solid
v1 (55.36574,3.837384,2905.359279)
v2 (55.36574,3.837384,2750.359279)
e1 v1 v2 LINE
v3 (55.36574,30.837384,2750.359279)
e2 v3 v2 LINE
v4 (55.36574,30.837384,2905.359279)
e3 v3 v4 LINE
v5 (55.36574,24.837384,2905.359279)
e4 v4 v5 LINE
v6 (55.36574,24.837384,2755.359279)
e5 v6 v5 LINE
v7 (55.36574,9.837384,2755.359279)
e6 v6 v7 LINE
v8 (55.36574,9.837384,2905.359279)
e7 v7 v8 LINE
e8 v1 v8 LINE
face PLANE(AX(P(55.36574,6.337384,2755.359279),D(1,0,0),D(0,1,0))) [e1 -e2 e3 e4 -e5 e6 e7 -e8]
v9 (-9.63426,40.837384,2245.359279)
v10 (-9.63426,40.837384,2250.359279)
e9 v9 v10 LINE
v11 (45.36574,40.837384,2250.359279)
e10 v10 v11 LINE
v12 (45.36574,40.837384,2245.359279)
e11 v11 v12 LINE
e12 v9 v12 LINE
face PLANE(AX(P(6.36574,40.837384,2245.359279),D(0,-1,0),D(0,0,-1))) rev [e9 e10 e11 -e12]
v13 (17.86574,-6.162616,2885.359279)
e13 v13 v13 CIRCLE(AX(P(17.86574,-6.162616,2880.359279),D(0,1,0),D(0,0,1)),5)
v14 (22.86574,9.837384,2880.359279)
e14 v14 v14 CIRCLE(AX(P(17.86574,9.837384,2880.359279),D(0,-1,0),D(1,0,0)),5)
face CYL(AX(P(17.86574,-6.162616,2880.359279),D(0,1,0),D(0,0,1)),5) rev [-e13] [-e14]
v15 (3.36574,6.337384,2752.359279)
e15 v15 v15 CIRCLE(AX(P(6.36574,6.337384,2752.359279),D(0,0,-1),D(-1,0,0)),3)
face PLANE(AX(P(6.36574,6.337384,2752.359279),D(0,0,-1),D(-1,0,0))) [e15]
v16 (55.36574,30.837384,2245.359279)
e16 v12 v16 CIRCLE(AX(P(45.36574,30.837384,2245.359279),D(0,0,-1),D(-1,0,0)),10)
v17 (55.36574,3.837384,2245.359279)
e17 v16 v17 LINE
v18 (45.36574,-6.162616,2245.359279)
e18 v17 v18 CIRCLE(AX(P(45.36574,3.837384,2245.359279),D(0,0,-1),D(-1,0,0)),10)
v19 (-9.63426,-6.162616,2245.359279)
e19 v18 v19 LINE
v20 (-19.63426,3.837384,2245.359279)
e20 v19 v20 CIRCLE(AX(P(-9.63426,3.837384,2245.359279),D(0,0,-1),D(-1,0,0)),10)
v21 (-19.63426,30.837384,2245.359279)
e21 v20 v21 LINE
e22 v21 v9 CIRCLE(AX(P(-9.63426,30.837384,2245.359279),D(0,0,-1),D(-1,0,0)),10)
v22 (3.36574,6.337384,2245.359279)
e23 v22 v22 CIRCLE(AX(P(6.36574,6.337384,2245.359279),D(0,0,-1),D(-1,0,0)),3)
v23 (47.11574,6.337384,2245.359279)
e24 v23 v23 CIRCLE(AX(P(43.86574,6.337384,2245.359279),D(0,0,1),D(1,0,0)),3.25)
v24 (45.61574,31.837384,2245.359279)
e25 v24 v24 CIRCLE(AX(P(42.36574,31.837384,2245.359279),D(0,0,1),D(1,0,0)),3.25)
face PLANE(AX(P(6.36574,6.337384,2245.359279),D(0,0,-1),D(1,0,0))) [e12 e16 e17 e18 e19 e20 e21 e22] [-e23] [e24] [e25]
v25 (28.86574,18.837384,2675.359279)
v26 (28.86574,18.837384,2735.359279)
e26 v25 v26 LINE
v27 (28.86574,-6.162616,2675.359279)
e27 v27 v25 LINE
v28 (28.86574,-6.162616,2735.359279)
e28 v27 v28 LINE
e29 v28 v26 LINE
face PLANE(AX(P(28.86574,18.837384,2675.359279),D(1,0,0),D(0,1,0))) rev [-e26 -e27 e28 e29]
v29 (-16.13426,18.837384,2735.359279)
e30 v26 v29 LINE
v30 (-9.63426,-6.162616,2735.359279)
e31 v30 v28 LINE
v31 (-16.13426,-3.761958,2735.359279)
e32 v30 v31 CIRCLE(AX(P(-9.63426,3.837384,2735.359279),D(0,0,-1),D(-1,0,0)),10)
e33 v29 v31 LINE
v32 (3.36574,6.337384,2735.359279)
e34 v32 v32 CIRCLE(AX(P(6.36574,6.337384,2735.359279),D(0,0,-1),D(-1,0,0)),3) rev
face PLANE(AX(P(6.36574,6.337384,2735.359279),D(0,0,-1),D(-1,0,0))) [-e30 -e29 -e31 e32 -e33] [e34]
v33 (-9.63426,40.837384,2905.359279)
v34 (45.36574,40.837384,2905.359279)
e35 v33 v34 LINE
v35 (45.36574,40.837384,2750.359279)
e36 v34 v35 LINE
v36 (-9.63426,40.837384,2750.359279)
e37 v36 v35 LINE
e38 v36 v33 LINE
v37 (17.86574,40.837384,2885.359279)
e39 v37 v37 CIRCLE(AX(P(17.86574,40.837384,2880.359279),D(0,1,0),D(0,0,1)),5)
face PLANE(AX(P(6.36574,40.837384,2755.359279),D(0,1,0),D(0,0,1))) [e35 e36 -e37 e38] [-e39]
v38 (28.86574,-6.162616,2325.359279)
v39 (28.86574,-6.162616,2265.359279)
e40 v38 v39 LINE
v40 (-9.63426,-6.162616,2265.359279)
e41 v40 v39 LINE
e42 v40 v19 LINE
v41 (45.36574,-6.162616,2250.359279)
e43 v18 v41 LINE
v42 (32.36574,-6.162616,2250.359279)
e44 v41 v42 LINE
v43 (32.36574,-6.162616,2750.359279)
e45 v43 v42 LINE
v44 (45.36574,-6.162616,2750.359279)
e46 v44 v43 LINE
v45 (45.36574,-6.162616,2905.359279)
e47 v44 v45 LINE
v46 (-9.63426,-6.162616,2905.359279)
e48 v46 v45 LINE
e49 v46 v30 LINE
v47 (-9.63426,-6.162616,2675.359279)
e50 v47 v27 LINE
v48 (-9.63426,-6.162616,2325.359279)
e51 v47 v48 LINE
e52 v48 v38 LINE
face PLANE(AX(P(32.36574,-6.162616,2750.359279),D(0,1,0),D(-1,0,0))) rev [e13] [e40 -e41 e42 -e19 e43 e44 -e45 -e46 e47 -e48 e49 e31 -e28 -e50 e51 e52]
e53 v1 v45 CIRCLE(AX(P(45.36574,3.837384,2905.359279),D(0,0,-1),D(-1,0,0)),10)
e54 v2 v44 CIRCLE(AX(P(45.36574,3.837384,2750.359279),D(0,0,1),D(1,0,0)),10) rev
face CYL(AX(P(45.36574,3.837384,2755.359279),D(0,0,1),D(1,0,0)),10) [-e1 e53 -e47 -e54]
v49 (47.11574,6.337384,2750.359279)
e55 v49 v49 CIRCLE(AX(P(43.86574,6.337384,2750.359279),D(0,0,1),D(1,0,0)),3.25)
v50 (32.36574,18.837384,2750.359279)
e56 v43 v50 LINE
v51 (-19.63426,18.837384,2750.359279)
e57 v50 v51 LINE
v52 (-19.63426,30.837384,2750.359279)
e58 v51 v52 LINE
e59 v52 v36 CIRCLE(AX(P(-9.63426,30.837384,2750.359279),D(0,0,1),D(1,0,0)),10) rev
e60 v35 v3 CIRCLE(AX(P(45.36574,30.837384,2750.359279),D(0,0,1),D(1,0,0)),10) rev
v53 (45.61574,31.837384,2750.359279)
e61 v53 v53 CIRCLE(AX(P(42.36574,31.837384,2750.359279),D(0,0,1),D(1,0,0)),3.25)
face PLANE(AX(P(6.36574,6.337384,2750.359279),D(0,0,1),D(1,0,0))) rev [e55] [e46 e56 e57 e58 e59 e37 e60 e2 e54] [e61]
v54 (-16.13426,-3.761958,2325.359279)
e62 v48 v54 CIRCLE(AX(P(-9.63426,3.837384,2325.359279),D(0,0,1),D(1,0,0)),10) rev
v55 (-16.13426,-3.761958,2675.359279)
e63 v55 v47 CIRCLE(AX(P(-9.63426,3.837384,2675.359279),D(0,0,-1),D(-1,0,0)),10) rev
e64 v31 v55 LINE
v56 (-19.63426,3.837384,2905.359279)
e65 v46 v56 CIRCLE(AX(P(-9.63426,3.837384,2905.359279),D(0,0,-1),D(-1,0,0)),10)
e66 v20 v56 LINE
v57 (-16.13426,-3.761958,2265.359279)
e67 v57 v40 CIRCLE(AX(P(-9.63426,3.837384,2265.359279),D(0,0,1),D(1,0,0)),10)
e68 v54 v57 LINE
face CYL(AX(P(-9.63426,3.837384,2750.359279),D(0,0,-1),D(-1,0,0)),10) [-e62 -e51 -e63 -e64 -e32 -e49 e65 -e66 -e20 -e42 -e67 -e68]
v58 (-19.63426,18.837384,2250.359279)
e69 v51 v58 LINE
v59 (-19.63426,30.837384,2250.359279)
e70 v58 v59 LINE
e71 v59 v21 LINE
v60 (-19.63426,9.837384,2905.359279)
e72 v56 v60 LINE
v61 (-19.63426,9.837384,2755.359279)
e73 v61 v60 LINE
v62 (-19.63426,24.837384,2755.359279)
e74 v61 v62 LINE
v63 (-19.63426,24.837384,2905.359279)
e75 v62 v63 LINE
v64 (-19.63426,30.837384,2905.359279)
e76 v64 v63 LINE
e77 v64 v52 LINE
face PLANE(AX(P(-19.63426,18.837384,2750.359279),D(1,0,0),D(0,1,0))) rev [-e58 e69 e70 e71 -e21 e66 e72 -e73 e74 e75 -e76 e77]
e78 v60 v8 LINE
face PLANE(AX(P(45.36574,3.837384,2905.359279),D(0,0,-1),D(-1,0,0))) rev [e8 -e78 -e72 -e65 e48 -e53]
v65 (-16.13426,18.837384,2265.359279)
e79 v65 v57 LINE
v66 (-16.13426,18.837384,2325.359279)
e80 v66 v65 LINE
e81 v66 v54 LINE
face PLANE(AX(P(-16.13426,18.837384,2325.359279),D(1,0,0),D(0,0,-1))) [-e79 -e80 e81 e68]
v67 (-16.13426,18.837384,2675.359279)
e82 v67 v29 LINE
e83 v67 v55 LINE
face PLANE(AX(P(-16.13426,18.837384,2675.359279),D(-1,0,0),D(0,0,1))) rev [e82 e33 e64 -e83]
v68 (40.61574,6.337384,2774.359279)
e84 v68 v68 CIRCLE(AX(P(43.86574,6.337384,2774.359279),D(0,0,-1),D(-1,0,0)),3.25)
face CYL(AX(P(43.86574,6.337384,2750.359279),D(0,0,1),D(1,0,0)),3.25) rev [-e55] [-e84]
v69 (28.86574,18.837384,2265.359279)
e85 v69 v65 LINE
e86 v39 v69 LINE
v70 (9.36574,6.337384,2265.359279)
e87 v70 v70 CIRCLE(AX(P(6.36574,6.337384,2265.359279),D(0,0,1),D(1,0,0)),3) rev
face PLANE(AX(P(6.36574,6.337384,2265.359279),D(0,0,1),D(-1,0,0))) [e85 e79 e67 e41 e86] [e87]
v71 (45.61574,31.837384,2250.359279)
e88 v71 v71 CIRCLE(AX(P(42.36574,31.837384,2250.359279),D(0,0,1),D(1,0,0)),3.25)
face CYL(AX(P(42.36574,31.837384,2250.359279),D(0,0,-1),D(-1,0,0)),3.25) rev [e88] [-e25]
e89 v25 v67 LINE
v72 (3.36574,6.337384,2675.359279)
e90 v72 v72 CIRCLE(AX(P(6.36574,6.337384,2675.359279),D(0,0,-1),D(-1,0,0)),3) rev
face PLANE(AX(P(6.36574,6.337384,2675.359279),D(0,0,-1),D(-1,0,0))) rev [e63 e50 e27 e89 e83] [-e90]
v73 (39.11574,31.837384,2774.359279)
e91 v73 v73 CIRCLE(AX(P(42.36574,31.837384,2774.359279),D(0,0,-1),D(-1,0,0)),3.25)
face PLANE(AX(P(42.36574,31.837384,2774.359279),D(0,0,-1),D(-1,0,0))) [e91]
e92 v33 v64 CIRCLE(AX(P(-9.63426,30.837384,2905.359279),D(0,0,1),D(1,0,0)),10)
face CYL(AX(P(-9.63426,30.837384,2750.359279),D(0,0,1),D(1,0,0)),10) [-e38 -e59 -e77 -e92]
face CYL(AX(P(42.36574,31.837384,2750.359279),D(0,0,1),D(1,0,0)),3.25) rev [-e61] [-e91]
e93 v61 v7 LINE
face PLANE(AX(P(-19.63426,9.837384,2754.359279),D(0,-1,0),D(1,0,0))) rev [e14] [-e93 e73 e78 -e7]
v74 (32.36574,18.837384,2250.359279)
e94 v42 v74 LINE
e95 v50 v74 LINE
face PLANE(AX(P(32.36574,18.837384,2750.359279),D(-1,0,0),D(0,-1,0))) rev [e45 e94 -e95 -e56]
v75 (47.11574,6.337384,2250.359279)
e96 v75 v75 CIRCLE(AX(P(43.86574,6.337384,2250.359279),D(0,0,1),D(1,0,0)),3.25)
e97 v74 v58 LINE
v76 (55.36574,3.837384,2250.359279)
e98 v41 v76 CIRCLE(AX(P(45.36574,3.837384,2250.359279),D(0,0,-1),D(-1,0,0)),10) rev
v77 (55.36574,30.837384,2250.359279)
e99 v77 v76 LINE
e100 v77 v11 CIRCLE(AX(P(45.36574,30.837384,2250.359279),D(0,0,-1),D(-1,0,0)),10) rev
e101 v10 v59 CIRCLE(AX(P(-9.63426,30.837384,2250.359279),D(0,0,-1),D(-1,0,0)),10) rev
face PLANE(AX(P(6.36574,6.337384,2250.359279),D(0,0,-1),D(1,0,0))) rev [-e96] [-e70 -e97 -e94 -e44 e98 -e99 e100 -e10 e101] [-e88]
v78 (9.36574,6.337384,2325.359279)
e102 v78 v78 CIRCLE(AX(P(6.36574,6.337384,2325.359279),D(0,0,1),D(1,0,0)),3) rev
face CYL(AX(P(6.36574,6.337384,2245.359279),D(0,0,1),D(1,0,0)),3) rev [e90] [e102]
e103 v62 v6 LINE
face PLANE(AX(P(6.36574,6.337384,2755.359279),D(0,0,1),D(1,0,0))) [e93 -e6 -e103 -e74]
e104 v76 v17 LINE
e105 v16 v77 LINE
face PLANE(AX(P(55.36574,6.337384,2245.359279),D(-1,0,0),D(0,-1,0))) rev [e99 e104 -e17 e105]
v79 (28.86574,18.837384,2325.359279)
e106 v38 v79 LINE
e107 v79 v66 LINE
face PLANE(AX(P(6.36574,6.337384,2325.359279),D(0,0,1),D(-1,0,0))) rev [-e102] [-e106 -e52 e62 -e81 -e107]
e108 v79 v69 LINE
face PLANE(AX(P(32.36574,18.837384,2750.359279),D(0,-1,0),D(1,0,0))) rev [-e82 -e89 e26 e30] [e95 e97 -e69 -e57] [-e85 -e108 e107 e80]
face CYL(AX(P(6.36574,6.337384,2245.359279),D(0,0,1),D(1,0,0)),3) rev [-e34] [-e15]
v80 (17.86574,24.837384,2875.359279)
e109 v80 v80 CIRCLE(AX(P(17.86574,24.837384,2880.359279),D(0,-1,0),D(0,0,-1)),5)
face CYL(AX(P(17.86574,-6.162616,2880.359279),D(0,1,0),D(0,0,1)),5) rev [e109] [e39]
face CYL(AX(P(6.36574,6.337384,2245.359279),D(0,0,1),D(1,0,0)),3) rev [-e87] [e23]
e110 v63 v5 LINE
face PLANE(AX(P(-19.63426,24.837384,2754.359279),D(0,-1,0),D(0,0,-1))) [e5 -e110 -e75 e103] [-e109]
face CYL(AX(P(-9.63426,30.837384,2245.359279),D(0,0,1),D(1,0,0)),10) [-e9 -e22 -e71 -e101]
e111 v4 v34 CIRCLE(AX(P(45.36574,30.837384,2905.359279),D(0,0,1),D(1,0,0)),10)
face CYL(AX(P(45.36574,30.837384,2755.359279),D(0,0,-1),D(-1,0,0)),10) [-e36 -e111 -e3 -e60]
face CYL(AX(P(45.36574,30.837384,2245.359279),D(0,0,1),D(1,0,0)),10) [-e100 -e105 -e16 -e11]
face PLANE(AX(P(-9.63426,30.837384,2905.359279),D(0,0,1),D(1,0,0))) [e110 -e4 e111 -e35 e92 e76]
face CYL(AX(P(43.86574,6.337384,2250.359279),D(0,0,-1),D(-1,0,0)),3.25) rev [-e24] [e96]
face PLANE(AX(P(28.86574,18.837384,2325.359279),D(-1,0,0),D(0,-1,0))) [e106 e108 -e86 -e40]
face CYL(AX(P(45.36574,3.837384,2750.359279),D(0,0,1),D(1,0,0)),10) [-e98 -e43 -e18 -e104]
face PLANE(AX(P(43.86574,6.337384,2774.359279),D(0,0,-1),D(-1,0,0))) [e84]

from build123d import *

# Parameters (mm, degrees)
SKETCH1_W                = 520
SKETCH1_H                = 250
BOSS_EXTRUDE1_DEPTH      = 5000
SKETCH2_W                = 450
SKETCH2_H                = 250
CUT_EXTRUDE1_DEPTH       = 600
SKETCH3_W                = 750
SKETCH3_H                = 470
BOSS_EXTRUDE2_DEPTH      = 50
SKETCH4_R                = 32.5
CUT_EXTRUDE2_DEPTH       = 50
CUT_EXTRUDE3_DEPTH       = 4937.509394299
CUT_EXTRUDE3_DEPTH_BACK  = 170
SKETCH5_R                = 30
SCALE2_SCALE             = 0.1
FILLET1_R                = 10
BOSS_EXTRUDE9_DEPTH      = 150
BOSS_EXTRUDE9_DEPTH_BACK = 1
CUT_EXTRUDE4_DEPTH       = 2907.266833376
CUT_EXTRUDE4_DEPTH_BACK  = 2907.266833376
SKETCH7_R                = 5
SKETCH8_R                = 3.25
CUT_EXTRUDE5_DEPTH       = 20


with BuildPart() as part:
    # Sketch1 → Boss-Extrude1 (new body)
    with BuildSketch(Plane.XY):
        Rectangle(SKETCH1_W, SKETCH1_H)
    extrude(amount=BOSS_EXTRUDE1_DEPTH)

    # Sketch2 → Cut-Extrude1 (cut)
    with BuildSketch(Plane.XY.offset(4850)):
        Rectangle(SKETCH2_W, SKETCH2_H)
    cut_extrude1 = extrude(amount=-CUT_EXTRUDE1_DEPTH, mode=Mode.SUBTRACT)

    # Mirror1: Cut-Extrude1 across plane
    add(cut_extrude1.mirror(Plane.XY.offset(2500)), mode=Mode.SUBTRACT)

    # Sketch3 → Boss-Extrude2 (add)
    with BuildSketch(Plane.XY.offset(5000)):
        with Locations((115, 110)):
            Rectangle(SKETCH3_W, SKETCH3_H)
    boss_extrude2 = extrude(amount=BOSS_EXTRUDE2_DEPTH)

    # Sketch4 → Cut-Extrude2 (cut)
    with BuildSketch(Plane.XY.offset(5050)):
        with Locations((375, 0)):
            Circle(SKETCH4_R)
        with Locations((360, 255)):
            Circle(SKETCH4_R)
    cut_extrude2 = extrude(amount=-CUT_EXTRUDE2_DEPTH, mode=Mode.SUBTRACT)

    # Mirror2: Boss-Extrude2, Cut-Extrude2 across plane
    add(boss_extrude2.mirror(Plane.XY.offset(2500)))
    add(cut_extrude2.mirror(Plane.XY.offset(2500)), mode=Mode.SUBTRACT)

    # Sketch5 → Cut-Extrude3 (cut, two sides: drawn at the far end of the back side and taken through both)
    with BuildSketch(Plane(origin=(0, 0, 4850), x_dir=(-1, 0, 0), z_dir=(0, 0, -1)).offset(-CUT_EXTRUDE3_DEPTH_BACK)):
        with Locations(Location((0, 0, 0), (0, 0, 180))):
            Circle(SKETCH5_R)
    extrude(amount=CUT_EXTRUDE3_DEPTH + CUT_EXTRUDE3_DEPTH_BACK, mode=Mode.SUBTRACT)


with BuildPart() as part_1:
    # Scale2: scaled about (7.073044916, 7.041537563, 2500.399199176)
    add(part.part.scale(SCALE2_SCALE).moved(Location((6.365740424, 6.337383807, 2250.359279258))))

    # Fillet1
    # the kernel refuses this fillet: 10 mm, written as the material it takes off along each edge
    with BuildSketch(Plane(origin=(-19.634259576, 40.837383807, 2725.359279258), x_dir=(0, -1, 0), z_dir=(0, 0, 1)), Plane(origin=(55.365740424, 40.837383807, 2725.359279258), x_dir=(-1, 0, 0), z_dir=(0, 0, 1)), Plane(origin=(55.365740424, -6.162616193, 2275.359279258), x_dir=(-1, 0, 0), z_dir=(0, 0, -1))) as fillet1_piece_1:
        with BuildLine():
            CenterArc((FILLET1_R, FILLET1_R), FILLET1_R, 180, 90)
            Line((0, FILLET1_R), (0, 0))
            Line((0, 0), (FILLET1_R, 0))
        make_face()
    extrude(amount=55, mode=Mode.SUBTRACT)
    with BuildSketch(Plane(origin=(55.365740424, -6.162616193, 2725.359279258), x_dir=(-1, 0, 0), z_dir=(0, 0, 1)), Plane(origin=(-19.634259576, 40.837383807, 2275.359279258), x_dir=(0, -1, 0), z_dir=(0, 0, -1)), Plane(origin=(55.365740424, 40.837383807, 2275.359279258), x_dir=(-1, 0, 0), z_dir=(0, 0, -1))) as fillet1_piece_2:
        with BuildLine():
            CenterArc((FILLET1_R, -FILLET1_R), FILLET1_R, 90, 90)
            Line((0, -FILLET1_R), (0, 0))
            Line((0, 0), (FILLET1_R, 0))
        make_face()
    extrude(amount=55, mode=Mode.SUBTRACT)
    with BuildSketch(Plane(origin=(-19.634259576, -6.162616193, 2220.359279258), x_dir=(0, 1, 0), z_dir=(0, 0, 1))) as fillet1_piece_3:
        with BuildLine():
            CenterArc((FILLET1_R, -FILLET1_R), FILLET1_R, 90, 90)
            Line((0, -FILLET1_R), (0, 0))
            Line((0, 0), (FILLET1_R, 0))
        make_face()
    extrude(amount=560, mode=Mode.SUBTRACT)

    # Sketch6 → Boss-Extrude9 (add, two sides: drawn at the far end of the back side and taken through both)
    with BuildSketch(Plane.XY.offset(2755.359279258).offset(-BOSS_EXTRUDE9_DEPTH_BACK)):
        with BuildLine():
            Line((-9.634259575, -6.162616194), (45.365740425, -6.162616194))
            ThreePointArc((45.365740425, -6.162616194), (52.436808237, -3.233684006), (55.365740425, 3.837383806))
            Line((55.365740425, 3.837383806), (55.365740425, 9.837383806))
            Line((55.365740425, 9.837383806), (-19.634259575, 9.837383806))
            Line((-19.634259575, 9.837383806), (-19.634259575, 3.837383806))
            ThreePointArc((-19.634259575, 3.837383806), (-16.705327387, -3.233684006), (-9.634259575, -6.162616194))
        make_face()
        with BuildLine():
            Line((-9.634259575, 40.837383806), (45.365740425, 40.837383806))
            ThreePointArc((45.365740425, 40.837383806), (52.436808237, 37.908451618), (55.365740425, 30.837383806))
            Line((55.365740425, 30.837383806), (55.365740425, 24.837383806))
            Line((55.365740425, 24.837383806), (-19.634259575, 24.837383806))
            Line((-19.634259575, 24.837383806), (-19.634259575, 30.837383806))
            ThreePointArc((-19.634259575, 30.837383806), (-16.705327387, 37.908451618), (-9.634259575, 40.837383806))
        make_face()
    extrude(amount=BOSS_EXTRUDE9_DEPTH + BOSS_EXTRUDE9_DEPTH_BACK)

    # Sketch7 → Cut-Extrude4 (cut, two sides: drawn at the far end of the back side and taken through both)
    with BuildSketch(Plane(origin=(0, 40.837383806, 0), x_dir=(1, 0, 0), z_dir=(0, 1, 0)).offset(-CUT_EXTRUDE4_DEPTH_BACK)):
        with Locations(Location((17.865740425, -2880.359279258, 0), (0, 0, 270))):
            Circle(SKETCH7_R)
    extrude(amount=CUT_EXTRUDE4_DEPTH + CUT_EXTRUDE4_DEPTH_BACK, mode=Mode.SUBTRACT)

    # Sketch8 → Cut-Extrude5 (cut)
    with BuildSketch(Plane(origin=(0, 0, 2754.359279258), x_dir=(-1, 0, 0), z_dir=(0, 0, -1))):
        with Locations(Location((-42.365740425, 31.837383806, 0), (0, 0, 180))):
            Circle(SKETCH8_R)
        with Locations(Location((-43.865740425, 6.337383806, 0), (0, 0, 180))):
            Circle(SKETCH8_R)
    extrude(amount=-CUT_EXTRUDE5_DEPTH, mode=Mode.SUBTRACT)


solid = part_1.part
